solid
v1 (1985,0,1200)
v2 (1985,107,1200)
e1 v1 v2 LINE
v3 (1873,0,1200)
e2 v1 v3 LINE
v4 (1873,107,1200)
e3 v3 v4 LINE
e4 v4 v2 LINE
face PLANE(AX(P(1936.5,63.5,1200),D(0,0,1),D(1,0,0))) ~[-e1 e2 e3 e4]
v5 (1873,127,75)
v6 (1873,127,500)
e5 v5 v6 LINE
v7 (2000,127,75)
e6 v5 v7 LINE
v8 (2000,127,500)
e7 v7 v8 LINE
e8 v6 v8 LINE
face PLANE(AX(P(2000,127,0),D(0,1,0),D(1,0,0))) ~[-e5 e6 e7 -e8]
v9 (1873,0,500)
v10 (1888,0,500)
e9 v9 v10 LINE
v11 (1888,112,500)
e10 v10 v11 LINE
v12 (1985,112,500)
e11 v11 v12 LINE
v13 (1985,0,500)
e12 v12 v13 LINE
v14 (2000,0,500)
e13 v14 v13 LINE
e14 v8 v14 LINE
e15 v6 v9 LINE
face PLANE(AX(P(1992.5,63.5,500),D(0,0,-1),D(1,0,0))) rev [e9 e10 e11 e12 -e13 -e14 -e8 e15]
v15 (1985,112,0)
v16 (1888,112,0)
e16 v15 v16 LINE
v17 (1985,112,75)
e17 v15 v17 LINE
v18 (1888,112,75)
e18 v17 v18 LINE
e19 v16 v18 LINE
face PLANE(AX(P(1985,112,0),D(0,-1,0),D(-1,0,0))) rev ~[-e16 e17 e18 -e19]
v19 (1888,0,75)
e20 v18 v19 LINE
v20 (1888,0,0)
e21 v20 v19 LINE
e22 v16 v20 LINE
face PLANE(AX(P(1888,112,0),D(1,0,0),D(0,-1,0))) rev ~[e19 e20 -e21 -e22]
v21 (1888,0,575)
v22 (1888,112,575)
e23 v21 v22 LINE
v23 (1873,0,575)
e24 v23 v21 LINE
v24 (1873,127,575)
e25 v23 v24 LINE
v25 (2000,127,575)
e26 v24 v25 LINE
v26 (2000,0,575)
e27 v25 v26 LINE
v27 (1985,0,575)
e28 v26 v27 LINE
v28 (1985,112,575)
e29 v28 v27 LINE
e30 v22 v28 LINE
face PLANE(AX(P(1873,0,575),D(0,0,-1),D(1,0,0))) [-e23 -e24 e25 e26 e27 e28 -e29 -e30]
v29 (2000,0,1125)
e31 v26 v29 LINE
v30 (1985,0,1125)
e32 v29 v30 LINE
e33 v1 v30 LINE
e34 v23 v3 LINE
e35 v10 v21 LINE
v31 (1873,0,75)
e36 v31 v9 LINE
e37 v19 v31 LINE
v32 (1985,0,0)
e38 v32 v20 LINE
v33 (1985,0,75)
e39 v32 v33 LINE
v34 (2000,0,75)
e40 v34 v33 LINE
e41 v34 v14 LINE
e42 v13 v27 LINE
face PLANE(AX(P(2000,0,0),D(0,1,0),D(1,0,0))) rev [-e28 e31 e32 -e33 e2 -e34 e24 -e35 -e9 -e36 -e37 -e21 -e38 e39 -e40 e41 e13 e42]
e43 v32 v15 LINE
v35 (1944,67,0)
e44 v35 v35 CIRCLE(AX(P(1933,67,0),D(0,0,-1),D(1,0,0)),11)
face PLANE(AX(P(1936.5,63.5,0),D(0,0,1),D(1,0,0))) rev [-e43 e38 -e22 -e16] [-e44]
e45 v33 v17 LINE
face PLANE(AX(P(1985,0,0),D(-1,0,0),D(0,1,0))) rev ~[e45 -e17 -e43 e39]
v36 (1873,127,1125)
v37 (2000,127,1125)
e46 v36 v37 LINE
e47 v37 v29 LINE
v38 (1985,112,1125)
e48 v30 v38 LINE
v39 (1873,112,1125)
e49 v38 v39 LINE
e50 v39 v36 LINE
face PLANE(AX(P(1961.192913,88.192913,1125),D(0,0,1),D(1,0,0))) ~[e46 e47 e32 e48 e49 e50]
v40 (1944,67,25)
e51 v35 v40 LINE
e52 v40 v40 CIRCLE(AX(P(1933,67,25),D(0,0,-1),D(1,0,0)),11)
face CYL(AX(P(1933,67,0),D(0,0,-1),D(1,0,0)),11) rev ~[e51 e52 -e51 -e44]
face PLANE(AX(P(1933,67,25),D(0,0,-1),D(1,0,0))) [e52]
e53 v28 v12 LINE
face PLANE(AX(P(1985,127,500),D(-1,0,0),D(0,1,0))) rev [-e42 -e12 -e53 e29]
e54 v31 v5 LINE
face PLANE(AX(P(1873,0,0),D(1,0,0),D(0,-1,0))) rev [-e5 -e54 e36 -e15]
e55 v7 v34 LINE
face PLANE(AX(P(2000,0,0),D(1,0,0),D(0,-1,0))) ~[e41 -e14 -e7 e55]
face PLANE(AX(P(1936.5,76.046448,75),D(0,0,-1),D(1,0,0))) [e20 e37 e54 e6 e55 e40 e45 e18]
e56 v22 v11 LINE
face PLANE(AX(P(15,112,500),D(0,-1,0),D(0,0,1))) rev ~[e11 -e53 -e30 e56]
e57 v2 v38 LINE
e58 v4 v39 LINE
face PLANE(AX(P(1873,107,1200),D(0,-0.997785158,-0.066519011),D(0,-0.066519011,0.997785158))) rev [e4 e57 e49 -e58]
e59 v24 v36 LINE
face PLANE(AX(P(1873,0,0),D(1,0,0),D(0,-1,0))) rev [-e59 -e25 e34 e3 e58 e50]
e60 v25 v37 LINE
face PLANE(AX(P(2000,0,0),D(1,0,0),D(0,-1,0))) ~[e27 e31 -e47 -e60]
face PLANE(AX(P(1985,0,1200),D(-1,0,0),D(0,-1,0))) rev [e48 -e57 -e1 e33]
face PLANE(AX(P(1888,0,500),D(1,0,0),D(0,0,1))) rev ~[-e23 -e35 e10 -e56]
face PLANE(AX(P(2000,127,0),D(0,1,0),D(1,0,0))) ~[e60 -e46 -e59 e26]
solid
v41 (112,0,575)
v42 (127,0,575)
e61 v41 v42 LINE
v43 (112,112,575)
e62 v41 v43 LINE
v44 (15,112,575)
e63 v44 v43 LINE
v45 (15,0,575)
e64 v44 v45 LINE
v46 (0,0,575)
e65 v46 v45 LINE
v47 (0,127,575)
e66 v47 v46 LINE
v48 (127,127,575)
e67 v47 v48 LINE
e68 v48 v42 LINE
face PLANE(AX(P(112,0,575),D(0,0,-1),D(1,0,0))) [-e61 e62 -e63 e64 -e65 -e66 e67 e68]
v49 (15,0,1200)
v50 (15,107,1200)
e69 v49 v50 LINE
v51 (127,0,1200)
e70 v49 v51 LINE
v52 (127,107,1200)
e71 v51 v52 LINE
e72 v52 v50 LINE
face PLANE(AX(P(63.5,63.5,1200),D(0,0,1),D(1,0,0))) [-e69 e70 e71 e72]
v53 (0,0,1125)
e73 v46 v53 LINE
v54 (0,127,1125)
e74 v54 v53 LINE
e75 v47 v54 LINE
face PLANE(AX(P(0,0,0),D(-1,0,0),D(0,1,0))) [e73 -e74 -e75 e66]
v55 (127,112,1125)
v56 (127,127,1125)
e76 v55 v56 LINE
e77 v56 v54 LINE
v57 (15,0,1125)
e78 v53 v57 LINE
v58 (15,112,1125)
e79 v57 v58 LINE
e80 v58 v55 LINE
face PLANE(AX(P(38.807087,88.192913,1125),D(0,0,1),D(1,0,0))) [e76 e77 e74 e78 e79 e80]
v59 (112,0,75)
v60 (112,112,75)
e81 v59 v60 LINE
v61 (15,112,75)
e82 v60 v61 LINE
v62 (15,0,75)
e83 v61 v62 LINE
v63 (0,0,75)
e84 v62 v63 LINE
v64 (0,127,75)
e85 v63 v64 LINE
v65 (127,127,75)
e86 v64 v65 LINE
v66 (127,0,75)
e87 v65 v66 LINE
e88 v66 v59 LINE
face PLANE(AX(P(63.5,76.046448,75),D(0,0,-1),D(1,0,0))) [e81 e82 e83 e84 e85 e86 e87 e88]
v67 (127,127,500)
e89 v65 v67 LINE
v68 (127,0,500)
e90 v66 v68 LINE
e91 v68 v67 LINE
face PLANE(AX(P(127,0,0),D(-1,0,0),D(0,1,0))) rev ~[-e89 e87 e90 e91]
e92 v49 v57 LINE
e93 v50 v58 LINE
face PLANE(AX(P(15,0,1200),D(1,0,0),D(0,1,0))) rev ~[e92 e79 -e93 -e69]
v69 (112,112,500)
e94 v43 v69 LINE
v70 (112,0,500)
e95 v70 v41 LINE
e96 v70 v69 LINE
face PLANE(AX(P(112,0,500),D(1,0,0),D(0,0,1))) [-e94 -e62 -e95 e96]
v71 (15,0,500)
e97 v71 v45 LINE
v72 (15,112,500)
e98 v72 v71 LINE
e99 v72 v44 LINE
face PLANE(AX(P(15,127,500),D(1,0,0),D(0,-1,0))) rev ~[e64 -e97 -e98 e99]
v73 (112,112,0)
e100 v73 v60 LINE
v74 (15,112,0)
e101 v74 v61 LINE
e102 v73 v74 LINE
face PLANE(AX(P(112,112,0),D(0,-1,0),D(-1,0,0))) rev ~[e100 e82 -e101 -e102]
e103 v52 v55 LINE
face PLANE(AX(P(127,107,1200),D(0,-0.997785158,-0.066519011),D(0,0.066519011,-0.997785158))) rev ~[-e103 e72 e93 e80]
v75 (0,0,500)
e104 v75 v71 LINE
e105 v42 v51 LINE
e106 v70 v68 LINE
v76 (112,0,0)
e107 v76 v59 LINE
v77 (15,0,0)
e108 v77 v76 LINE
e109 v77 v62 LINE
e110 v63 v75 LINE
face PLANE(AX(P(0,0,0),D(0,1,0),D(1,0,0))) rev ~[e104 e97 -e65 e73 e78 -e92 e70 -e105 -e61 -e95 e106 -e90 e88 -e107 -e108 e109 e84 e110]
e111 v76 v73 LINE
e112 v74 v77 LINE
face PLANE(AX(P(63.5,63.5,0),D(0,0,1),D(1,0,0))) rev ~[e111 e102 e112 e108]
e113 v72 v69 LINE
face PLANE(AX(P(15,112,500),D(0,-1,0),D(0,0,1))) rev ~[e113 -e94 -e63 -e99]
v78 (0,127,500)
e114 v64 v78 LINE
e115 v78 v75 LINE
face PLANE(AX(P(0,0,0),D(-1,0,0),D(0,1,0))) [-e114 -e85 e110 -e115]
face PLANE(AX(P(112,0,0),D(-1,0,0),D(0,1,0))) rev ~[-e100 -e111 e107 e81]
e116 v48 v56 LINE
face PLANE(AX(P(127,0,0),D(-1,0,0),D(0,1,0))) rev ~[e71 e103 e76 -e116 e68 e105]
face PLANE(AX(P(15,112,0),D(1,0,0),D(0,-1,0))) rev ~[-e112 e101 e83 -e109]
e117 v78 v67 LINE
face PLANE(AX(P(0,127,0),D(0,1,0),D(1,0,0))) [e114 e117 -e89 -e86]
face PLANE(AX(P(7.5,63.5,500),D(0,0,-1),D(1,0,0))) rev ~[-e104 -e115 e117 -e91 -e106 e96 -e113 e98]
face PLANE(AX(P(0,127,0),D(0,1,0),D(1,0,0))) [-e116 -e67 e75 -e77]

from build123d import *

# Parameters (mm, degrees)
F0_W      = 127
F0_H      = 127
F1_DEPTH  = 1200
F3_DEPTH  = 75
F5_START  = -500
F4_W      = 15
F4_H      = 127
F5_DEPTH  = 75
F7_DEPTH  = 127.001
F11_DEPTH = 75
F13_DEPTH = 75
F14_W     = 15
F14_H     = 75
F15_DEPTH = 127.001
F16_W     = 15
F16_H     = 75
F17_DEPTH = 127.001
F18_W     = 15
F18_H     = 75
F19_DEPTH = 1985.001
F20_W     = 15
F20_H     = 75
F21_DEPTH = 112.001
F22_R     = 11
F23_DEPTH = 25


# Not quite as in the source:
# - a feature names something its author has since deleted; it is built from what else it names


with BuildPart() as f1:
    # F0 (on Top) → F1 (new body)
    with BuildSketch(Plane.XY):
        with Locations((63.5, 63.5)):
            Rectangle(F0_W, F0_H)
    extrude(amount=F1_DEPTH)

    # F2 (on face) → F3 (cut)
    with BuildSketch(Plane.XY.offset(1200)):
        Polygon((0, 127), (0, 0), (15, 0), (15, 112), (127, 112), (127, 127), align=None)
    extrude(amount=-F3_DEPTH, mode=Mode.SUBTRACT)

    # F4 (on face) → F5 (cut)
    with BuildSketch(Plane(origin=(0, 0, 0), x_dir=(1, 0, 0), z_dir=(0, 0, -1)).offset(F5_START)):
        with Locations((7.5, -63.5)):
            Rectangle(F4_W, F4_H)
    extrude(amount=-F5_DEPTH, mode=Mode.SUBTRACT)

    # F6 (on face) → F7 (cut, through all)
    with BuildSketch(Plane.YZ.offset(127)):
        Polygon((112, 1125), (112, 1200), (107, 1200), align=None)
    extrude(amount=-F7_DEPTH, mode=Mode.SUBTRACT)


with BuildPart() as f9_1:
    # F9: instance of F1
    add(f1.part.mirror(Plane.YZ.offset(1000)))

    # F10 (on face) → F11 (cut)
    with BuildSketch(Plane(origin=(0, 0, 0), x_dir=(1, 0, 0), z_dir=(0, 0, -1))):
        Polygon((1873, -127), (2000, -127), (2000, 0), (1985, 0), (1985, -112), (1888, -112), (1888, 0), (1873, 0), align=None)
    extrude(amount=-F11_DEPTH, mode=Mode.SUBTRACT)

    # F16 (on face) → F17 (cut, through all)
    with BuildSketch(Plane.XZ):
        with Locations((1880.5, 537.5)):
            Rectangle(F16_W, F16_H)
    extrude(amount=-F17_DEPTH, mode=Mode.SUBTRACT)


with BuildPart() as f1_1:
    add(f1.part)

    # F12 (on face) → F13 (cut)
    with BuildSketch(Plane(origin=(0, 0, 0), x_dir=(1, 0, 0), z_dir=(0, 0, -1))):
        Polygon((0, -127), (127, -127), (127, 0), (112, 0), (112, -112), (15, -112), (15, 0), (0, 0), align=None)
    extrude(amount=-F13_DEPTH, mode=Mode.SUBTRACT)

    # F14 (on face) → F15 (cut, through all)
    with BuildSketch(Plane.XZ):
        with Locations((119.5, 537.5)):
            Rectangle(F14_W, F14_H)
    extrude(amount=-F15_DEPTH, mode=Mode.SUBTRACT)


with BuildPart() as f19_tool:
    # F18 (on face) → F19 (new body, through all)
    with BuildSketch(Plane(origin=(15, 0, 0), x_dir=(0, -1, 0), z_dir=(-1, 0, 0))):
        with Locations((-119.5, 537.5)):
            Rectangle(F18_W, F18_H)
    extrude(amount=-F19_DEPTH)


with BuildPart() as f1_2:
    add(f1_1.part)

    # F19: cut by f19_tool
    add(f19_tool.part, mode=Mode.SUBTRACT)

    # F20 (on face) → F21 (cut, through all)
    with BuildSketch(Plane(origin=(1888, 0, 0), x_dir=(0, -1, 0), z_dir=(-1, 0, 0))):
        with Locations((-119.5, 537.5)):
            Rectangle(F20_W, F20_H)
    extrude(amount=-F21_DEPTH, mode=Mode.SUBTRACT)


with BuildPart() as f9_1_1:
    add(f9_1.part)

    # F19: cut by f19_tool
    add(f19_tool.part, mode=Mode.SUBTRACT)

    # F22 (on face) → F23 (cut)
    with BuildSketch(Plane(origin=(0, 0, 0), x_dir=(1, 0, 0), z_dir=(0, 0, -1))):
        with Locations((1933, -67)):
            Circle(F22_R)
    extrude(amount=-F23_DEPTH, mode=Mode.SUBTRACT)


solid = Compound([f1_2.part, f9_1_1.part])
